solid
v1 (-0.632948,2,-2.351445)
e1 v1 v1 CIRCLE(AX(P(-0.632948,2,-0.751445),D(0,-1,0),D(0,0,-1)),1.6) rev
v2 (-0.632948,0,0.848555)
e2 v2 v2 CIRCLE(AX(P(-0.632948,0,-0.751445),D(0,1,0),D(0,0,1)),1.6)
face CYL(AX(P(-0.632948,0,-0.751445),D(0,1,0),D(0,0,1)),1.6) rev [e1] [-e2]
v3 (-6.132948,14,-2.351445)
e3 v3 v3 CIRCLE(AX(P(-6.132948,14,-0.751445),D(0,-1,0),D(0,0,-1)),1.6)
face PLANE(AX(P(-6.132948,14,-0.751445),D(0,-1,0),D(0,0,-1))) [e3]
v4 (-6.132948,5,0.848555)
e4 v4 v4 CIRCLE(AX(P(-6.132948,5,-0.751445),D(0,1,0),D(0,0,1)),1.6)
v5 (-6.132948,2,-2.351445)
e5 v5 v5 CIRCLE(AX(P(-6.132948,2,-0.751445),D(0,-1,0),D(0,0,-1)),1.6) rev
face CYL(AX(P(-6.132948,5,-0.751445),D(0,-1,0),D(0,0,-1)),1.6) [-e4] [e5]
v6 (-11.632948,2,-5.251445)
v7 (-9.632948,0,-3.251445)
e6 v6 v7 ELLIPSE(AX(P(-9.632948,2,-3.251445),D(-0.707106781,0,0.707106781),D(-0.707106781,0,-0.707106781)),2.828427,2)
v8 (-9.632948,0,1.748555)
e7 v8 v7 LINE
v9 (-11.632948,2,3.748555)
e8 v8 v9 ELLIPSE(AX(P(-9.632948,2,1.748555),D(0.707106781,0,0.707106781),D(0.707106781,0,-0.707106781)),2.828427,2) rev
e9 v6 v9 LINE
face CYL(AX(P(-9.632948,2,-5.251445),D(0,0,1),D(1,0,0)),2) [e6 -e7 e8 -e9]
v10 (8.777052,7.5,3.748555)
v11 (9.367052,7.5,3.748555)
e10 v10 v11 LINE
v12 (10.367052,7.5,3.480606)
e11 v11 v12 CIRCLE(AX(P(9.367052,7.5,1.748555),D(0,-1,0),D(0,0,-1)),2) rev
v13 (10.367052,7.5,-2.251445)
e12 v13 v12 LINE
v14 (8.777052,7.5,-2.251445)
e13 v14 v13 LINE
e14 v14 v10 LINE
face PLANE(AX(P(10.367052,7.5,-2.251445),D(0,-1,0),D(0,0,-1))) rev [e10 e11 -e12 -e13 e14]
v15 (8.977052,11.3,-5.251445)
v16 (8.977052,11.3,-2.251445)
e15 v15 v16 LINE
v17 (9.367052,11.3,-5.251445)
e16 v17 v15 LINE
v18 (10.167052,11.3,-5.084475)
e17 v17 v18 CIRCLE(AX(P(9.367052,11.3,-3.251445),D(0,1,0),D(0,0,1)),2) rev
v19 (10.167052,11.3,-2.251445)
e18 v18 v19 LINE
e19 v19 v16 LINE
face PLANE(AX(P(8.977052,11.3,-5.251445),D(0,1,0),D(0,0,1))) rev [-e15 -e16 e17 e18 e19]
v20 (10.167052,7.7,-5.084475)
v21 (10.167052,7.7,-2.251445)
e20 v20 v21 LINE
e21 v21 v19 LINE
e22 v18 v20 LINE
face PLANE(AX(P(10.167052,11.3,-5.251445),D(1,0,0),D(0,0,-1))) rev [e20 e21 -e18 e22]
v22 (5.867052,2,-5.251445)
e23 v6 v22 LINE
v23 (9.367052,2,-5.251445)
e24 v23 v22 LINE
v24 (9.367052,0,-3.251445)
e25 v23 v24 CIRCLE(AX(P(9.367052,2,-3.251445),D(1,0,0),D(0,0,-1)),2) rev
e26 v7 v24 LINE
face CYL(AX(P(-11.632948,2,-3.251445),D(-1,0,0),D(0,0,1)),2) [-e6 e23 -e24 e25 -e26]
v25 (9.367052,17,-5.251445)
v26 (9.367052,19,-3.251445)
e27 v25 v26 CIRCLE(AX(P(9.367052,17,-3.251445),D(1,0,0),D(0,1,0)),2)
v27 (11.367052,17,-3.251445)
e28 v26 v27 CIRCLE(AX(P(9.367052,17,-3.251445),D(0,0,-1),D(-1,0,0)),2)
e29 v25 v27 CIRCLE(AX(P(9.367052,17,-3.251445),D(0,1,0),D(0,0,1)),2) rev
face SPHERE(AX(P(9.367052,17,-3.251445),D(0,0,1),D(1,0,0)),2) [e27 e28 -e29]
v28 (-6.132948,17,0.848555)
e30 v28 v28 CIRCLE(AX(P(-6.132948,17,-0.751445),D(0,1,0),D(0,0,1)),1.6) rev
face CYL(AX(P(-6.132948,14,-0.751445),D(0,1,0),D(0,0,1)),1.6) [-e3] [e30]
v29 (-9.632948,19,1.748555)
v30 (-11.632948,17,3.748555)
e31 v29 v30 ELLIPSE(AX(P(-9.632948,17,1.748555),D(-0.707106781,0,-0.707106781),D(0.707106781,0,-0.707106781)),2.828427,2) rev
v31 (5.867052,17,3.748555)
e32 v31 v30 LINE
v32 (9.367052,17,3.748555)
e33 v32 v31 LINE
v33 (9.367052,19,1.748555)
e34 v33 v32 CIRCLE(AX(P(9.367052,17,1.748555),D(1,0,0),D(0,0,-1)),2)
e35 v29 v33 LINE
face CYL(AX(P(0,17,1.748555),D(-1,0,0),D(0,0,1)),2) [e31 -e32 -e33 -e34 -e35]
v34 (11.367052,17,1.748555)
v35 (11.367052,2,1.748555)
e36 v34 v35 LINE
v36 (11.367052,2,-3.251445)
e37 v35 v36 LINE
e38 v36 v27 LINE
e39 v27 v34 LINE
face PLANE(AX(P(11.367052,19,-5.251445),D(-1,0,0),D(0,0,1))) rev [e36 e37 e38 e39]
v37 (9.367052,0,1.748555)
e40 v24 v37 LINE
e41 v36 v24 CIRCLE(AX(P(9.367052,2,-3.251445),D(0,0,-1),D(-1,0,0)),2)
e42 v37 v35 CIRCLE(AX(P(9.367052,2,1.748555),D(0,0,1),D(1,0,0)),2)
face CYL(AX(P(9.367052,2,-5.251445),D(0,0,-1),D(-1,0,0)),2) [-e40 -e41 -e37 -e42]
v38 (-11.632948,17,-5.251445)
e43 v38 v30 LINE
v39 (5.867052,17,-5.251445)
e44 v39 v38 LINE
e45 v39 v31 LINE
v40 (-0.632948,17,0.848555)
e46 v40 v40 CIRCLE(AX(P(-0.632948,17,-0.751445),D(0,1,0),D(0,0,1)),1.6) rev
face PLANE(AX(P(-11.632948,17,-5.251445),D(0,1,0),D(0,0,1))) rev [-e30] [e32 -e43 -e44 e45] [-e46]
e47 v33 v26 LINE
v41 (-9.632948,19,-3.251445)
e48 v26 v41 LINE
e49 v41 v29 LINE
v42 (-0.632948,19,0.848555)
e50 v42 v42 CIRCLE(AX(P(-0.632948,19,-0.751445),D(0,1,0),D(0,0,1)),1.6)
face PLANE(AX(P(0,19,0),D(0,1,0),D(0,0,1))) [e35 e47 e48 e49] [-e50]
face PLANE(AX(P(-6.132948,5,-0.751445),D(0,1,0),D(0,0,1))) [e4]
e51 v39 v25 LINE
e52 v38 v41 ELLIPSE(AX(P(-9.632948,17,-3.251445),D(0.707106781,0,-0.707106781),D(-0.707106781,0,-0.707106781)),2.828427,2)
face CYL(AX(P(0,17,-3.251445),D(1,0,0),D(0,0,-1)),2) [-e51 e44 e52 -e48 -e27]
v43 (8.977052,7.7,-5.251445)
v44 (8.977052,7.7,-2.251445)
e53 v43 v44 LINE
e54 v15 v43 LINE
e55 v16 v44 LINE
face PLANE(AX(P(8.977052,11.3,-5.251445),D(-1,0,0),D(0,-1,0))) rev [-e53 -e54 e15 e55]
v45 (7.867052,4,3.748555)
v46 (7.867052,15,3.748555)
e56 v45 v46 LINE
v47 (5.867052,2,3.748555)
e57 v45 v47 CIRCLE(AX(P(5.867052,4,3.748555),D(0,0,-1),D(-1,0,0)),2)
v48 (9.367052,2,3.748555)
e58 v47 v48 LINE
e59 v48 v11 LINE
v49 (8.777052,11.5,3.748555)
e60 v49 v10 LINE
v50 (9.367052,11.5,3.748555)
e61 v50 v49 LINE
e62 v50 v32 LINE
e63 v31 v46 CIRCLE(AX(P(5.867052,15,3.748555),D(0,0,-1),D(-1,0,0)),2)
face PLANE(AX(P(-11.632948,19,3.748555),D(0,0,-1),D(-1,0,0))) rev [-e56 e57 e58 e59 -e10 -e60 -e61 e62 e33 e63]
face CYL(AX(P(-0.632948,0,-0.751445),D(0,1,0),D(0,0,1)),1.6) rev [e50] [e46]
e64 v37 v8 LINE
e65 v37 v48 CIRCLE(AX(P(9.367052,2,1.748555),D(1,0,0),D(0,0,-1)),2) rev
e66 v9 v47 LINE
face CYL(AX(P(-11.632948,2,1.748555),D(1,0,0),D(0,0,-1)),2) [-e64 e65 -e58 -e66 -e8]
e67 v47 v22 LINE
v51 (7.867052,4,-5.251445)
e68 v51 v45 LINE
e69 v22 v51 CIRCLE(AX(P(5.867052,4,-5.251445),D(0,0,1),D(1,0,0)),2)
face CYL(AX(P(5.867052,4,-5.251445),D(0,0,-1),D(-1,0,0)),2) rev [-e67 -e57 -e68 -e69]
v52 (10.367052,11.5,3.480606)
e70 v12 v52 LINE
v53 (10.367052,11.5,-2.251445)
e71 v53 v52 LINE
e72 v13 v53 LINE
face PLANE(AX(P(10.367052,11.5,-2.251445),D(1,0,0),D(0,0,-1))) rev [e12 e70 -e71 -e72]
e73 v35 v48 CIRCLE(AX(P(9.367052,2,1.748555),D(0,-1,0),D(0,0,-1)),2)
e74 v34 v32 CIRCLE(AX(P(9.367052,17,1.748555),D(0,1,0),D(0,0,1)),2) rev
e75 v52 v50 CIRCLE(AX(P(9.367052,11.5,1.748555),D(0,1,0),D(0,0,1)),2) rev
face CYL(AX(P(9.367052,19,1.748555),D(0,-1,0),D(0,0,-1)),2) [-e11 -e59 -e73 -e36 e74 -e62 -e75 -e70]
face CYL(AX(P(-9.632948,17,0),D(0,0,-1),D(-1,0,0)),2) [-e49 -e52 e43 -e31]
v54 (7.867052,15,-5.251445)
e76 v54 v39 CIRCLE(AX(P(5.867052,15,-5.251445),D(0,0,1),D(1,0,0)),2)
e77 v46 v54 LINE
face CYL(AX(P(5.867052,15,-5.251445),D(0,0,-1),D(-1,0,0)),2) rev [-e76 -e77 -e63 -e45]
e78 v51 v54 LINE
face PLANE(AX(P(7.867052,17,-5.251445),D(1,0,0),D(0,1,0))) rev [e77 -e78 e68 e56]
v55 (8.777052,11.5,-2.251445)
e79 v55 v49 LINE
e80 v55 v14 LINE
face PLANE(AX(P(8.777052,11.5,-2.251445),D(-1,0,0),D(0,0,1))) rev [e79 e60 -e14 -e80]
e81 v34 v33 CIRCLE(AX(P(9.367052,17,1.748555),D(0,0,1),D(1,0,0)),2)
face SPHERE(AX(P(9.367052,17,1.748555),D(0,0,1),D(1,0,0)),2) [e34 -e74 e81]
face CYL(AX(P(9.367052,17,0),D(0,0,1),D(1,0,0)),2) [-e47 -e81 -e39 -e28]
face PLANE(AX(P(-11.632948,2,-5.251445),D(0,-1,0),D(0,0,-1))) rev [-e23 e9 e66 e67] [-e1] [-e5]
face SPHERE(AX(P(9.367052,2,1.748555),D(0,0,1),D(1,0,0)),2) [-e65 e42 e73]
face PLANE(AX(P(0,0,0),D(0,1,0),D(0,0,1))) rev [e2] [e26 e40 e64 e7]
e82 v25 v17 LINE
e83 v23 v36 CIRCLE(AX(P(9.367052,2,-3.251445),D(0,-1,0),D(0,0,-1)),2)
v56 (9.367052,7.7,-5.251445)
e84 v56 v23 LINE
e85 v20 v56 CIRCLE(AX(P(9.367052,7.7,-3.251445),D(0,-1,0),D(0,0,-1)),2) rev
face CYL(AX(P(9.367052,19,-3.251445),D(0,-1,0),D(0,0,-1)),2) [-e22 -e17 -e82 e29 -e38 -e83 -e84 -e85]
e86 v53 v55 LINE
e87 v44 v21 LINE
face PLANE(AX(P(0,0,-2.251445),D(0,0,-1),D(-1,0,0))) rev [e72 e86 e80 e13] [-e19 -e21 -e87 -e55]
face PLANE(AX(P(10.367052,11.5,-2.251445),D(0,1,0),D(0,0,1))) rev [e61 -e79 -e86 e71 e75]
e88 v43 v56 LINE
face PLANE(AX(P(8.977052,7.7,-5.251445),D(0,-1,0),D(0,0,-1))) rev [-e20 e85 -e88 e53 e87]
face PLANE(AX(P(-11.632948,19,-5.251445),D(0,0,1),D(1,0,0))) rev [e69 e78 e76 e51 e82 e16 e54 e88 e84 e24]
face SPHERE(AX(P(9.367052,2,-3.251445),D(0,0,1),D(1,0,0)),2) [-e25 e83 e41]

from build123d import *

# Parameters (mm, degrees)
SKETCH1_W      = 23
SKETCH1_H      = 9
EXTRUDE1_DEPTH = 19
SKETCH2_R      = 1.6
EXTRUDE2_DEPTH = 23.888930821
SKETCH3_W      = 19.5
SKETCH3_H      = 15
EXTRUDE3_DEPTH = 25.02759827
SKETCH6_R      = 1.6
EXTRUDE4_DEPTH = 3
EXTRUDE5_START = 3
SKETCH7_R      = 1.6
EXTRUDE5_DEPTH = 3
FILLET1_R      = 2
SKETCH8_W      = 1.59
SKETCH8_H      = 4
EXTRUDE6_DEPTH = 6
SKETCH9_W      = 1.19
SKETCH9_H      = 3.6
EXTRUDE7_DEPTH = 24.072179755


with BuildPart() as part:
    # Sketch1 → Extrude1 (new body)
    with BuildSketch(Plane(origin=(0, 0, 0), x_dir=(1, 0, 0), z_dir=(0, 1, 0))):
        with Locations((-0.132947977, 0.751445087)):
            Rectangle(SKETCH1_W, SKETCH1_H)
    extrude(amount=EXTRUDE1_DEPTH)

    # Sketch2 → Extrude2 (cut, through all)
    with BuildSketch(Plane(origin=(0, 19, 0), x_dir=(1, 0, 0), z_dir=(0, 1, 0))):
        with Locations(Location((-0.632947977, 0.751445087, 0), (0, 0, 270))):
            Circle(SKETCH2_R)
    extrude(amount=-EXTRUDE2_DEPTH, mode=Mode.SUBTRACT)

    # Sketch3 → Extrude3 (cut, through all)
    with BuildSketch(Plane.XY.offset(3.748554913)):
        with Locations((-1.882947977, 9.5)):
            Rectangle(SKETCH3_W, SKETCH3_H)
    extrude(amount=-EXTRUDE3_DEPTH, mode=Mode.SUBTRACT)

    # Sketch6 → Extrude4 (add)
    with BuildSketch(Plane(origin=(0, 2, 0), x_dir=(1, 0, 0), z_dir=(0, 1, 0))):
        with Locations(Location((-6.132947977, 0.751445087, 0), (0, 0, 90))):
            Circle(SKETCH6_R)
    extrude(amount=EXTRUDE4_DEPTH)

    # Sketch7 → Extrude5 (add)
    with BuildSketch(Plane.XZ.offset(-17).offset(EXTRUDE5_START)):
        with Locations(Location((-6.132947977, -0.751445087, 0), (0, 0, 270))):
            Circle(SKETCH7_R)
    extrude(amount=-EXTRUDE5_DEPTH)

    # Fillet1
    fillet1_edges = [part.edges().sort_by_distance(p)[0] for p in [
        (11.367052023, 19, -0.751445087),
        (-0.132947977, 19, -5.251445087),
        (7.867052023, 2, -0.751445087),
        (7.867052023, 17, -0.751445087),
        (-11.632947977, 19, -0.751445087),
        (-0.132947977, 0, -5.251445087),
        (11.367052023, 0, -0.751445087),
        (-0.132947977, 0, 3.748554913),
        (-11.632947977, 0, -0.751445087),
        (-0.132947977, 19, 3.748554913),
        (11.367052023, 9.5, -5.251445087),
        (11.367052023, 9.5, 3.748554913),
    ]]
    fillet(fillet1_edges, radius=FILLET1_R - 0.0001)  # a hair under: the kernel refuses the full size

    # Sketch8 → Extrude6 (cut)
    with BuildSketch(Plane.XY.offset(3.748554913)):
        with Locations((9.572052023, 9.5)):
            Rectangle(SKETCH8_W, SKETCH8_H)
    extrude(amount=-EXTRUDE6_DEPTH, mode=Mode.SUBTRACT)

    # Sketch9 → Extrude7 (cut, through all)
    with BuildSketch(Plane.XY.offset(-2.251445087)):
        with Locations((9.572052023, 9.5)):
            Rectangle(SKETCH9_W, SKETCH9_H)
    extrude(amount=-EXTRUDE7_DEPTH, mode=Mode.SUBTRACT)


solid = part.part
